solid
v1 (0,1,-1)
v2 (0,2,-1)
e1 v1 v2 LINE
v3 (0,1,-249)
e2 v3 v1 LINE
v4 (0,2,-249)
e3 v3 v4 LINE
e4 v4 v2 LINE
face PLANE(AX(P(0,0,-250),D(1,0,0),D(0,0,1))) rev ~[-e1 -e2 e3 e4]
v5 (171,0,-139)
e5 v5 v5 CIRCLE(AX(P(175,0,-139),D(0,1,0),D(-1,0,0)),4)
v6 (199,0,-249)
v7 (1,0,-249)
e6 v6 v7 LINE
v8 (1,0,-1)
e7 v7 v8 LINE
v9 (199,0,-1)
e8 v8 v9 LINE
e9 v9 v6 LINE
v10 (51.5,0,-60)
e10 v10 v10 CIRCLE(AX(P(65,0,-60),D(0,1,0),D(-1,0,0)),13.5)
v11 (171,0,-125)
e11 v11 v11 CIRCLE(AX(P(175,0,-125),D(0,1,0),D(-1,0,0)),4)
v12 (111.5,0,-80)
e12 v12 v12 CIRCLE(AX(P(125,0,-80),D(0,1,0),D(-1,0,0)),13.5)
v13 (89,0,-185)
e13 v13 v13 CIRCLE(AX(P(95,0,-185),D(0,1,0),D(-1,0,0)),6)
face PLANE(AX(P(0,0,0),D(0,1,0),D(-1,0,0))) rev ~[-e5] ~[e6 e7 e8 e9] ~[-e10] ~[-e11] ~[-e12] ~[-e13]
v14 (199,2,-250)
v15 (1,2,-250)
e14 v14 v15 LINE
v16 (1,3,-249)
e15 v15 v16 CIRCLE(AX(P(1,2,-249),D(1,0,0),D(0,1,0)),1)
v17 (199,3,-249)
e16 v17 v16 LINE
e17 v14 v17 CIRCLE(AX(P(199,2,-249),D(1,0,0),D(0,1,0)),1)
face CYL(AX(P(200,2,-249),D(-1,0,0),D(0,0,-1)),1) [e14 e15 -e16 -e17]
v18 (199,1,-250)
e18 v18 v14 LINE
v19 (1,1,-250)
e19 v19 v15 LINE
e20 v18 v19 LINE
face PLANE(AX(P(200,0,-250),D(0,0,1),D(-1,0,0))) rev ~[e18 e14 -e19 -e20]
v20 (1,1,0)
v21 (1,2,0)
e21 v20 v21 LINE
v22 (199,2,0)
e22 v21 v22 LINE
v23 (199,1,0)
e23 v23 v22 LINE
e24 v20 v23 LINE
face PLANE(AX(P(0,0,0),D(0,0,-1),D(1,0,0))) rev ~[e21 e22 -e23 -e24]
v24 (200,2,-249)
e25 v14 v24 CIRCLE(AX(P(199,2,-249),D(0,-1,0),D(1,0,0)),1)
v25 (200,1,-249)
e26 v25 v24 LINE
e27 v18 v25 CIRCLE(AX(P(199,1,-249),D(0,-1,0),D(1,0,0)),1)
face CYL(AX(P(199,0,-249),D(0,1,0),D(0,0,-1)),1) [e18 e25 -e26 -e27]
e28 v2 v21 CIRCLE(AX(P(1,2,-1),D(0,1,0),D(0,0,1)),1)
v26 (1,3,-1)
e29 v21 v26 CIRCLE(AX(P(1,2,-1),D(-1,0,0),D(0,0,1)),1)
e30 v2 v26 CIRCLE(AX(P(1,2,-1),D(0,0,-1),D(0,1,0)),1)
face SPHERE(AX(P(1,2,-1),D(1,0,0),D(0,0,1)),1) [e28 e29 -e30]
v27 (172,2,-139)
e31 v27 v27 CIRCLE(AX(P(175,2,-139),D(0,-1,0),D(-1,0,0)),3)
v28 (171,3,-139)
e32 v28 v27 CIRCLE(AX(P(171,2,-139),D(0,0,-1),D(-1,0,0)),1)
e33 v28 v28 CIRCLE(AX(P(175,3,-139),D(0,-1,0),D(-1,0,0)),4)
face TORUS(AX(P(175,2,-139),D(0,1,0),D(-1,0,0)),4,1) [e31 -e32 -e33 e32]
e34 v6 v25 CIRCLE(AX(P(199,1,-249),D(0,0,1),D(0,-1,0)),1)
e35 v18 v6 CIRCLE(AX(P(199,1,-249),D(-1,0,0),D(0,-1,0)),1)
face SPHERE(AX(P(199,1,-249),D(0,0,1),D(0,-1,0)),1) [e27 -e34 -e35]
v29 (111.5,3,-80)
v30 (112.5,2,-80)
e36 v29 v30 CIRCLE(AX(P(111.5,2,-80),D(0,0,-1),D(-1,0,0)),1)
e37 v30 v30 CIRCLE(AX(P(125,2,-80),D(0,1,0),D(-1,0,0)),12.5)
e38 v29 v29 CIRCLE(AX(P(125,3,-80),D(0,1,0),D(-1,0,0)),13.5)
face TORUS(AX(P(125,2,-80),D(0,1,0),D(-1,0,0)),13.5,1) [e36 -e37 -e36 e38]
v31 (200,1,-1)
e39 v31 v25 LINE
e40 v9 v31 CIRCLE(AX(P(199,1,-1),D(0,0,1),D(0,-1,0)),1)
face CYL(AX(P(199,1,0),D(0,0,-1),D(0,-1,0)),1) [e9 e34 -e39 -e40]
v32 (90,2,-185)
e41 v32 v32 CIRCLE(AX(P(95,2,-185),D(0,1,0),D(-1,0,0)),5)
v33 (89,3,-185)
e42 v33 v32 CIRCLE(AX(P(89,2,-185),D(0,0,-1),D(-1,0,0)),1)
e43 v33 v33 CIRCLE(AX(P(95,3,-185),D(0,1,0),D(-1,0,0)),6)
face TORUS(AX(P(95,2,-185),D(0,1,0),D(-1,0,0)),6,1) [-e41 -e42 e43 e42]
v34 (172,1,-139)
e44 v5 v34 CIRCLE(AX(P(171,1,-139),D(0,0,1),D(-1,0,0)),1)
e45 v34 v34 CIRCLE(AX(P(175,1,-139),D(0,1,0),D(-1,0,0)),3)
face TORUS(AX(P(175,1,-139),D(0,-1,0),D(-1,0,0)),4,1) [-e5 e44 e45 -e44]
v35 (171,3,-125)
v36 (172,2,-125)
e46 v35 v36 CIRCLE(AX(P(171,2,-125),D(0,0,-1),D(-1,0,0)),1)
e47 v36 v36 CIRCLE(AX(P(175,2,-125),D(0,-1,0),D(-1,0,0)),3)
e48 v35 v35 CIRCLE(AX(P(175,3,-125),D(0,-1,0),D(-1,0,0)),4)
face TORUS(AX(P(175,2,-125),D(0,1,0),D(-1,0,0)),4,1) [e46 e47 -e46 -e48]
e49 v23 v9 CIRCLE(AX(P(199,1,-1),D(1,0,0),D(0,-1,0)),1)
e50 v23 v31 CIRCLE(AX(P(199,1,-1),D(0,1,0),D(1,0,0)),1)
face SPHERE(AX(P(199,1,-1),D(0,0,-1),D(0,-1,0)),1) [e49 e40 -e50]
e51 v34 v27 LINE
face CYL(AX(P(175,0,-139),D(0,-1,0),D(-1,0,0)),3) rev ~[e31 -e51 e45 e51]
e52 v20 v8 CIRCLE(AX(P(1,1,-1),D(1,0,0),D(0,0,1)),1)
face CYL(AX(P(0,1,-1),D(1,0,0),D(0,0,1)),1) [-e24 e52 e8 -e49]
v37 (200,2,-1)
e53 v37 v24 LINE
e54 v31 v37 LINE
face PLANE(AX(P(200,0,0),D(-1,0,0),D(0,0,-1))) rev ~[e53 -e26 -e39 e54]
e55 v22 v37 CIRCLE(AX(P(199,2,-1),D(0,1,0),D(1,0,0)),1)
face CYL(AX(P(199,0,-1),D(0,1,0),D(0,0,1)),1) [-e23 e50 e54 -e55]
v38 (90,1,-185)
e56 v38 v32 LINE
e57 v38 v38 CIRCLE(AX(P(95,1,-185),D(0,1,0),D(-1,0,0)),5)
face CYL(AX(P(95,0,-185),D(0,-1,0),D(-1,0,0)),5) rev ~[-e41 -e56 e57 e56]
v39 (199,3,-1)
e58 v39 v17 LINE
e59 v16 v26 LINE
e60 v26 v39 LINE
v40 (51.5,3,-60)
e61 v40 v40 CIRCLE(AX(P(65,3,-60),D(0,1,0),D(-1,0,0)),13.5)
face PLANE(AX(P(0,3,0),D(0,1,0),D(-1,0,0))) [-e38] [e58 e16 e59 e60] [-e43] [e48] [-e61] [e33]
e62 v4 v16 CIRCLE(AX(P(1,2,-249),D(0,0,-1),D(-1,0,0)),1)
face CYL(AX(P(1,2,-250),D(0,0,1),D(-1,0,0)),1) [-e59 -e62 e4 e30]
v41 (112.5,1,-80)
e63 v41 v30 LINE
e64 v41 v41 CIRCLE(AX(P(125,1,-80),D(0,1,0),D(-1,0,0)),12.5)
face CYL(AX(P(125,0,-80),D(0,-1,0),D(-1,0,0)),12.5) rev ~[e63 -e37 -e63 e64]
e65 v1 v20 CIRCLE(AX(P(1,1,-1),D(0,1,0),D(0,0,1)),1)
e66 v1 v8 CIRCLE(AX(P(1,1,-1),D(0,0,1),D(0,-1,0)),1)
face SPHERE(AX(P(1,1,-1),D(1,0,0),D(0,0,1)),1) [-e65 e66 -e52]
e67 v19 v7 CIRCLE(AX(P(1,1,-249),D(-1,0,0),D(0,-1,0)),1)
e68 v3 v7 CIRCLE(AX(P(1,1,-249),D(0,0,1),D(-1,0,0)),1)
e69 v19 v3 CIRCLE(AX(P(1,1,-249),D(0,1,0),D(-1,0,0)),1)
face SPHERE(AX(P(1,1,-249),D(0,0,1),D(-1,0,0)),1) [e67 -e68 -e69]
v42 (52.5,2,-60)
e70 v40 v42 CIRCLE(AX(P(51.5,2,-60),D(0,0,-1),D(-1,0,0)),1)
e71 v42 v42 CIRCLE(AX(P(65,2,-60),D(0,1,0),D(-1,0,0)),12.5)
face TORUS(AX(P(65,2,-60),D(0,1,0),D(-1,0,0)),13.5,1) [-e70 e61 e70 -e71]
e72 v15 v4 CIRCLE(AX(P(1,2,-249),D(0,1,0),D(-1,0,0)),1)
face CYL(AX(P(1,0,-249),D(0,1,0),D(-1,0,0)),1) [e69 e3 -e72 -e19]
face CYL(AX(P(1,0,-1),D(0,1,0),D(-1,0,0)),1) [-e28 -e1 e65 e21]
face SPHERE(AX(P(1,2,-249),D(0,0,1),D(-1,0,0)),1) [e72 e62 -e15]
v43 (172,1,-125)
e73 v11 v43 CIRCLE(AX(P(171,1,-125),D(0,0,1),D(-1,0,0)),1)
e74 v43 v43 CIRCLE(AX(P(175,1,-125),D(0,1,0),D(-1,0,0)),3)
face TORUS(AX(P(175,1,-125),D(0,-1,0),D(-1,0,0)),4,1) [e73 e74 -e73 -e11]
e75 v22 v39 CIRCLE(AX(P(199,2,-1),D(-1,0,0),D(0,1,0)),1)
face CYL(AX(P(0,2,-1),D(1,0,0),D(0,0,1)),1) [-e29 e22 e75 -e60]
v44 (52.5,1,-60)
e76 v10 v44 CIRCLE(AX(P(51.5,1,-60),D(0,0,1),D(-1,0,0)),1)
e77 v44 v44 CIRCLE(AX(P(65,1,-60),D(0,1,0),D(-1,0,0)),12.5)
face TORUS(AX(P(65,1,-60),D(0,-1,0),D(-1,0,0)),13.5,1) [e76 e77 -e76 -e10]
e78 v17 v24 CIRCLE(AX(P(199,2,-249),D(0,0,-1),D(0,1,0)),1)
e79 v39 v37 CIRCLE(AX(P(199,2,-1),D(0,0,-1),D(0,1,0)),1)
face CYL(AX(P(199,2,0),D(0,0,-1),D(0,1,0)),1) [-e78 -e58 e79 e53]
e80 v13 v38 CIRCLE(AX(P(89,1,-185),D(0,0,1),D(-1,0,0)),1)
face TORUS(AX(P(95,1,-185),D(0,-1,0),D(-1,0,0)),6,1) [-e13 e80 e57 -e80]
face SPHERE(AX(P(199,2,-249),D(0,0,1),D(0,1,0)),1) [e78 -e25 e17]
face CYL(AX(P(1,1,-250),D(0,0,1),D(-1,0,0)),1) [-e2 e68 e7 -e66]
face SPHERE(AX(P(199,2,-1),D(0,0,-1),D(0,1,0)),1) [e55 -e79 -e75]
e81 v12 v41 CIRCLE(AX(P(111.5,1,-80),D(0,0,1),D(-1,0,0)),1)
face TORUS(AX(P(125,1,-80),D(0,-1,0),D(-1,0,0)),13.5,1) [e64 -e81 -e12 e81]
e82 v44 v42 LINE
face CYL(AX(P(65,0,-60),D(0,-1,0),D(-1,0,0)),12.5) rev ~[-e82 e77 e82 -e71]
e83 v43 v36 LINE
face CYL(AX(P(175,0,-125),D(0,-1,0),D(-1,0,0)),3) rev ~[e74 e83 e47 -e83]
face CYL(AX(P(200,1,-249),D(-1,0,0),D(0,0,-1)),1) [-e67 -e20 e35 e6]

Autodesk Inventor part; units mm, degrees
ref_plane "YZ Plane" through (0, 0, 0) normal (1, 0, 0) x (0, 1, 0)
ref_plane "XZ Plane" through (0, 0, 0) normal (0, 1, 0) x (-1, 0, 0)
ref_plane "XY Plane" through (0, 0, 0) normal (0, 0, 1) x (1, 0, 0)
sketch "page_lines" plane through (0, 0, 0) normal (0, 1, 0) x (-1, 0, 0)
  line L0 (0, 0) -> (-200, 0)
  line L1 (-200, 0) -> (-200, -250)
  line L2 (-200, -250) -> (0, -250)
  line L3 (0, -250) -> (0, 0)
  circle A0 centre (-65, -60) radius 6
  circle A1 centre (-125, -80) radius 6
  circle A2 centre (-65, -60) radius 12.5
  circle A3 centre (-65, -60) radius 8.5
  circle A4 centre (-125, -80) radius 8.5
  circle A5 centre (-125, -80) radius 12.5
  circle A6 centre (-175, -125) radius 3
  line L4 (-175, -125) -> (-175, -209)
  line L5 (-175, -125) -> (-91, -125) construction
  circle A7 centre (-175, -139) radius 3
  circle A8 centre (-175, -153) radius 3
  circle A9 centre (-175, -167) radius 3
  circle A10 centre (-175, -181) radius 3
  circle A11 centre (-175, -195) radius 3
  circle A12 centre (-175, -209) radius 3
  circle A13 centre (-95, -185) radius 2.5
  circle A14 centre (-95, -185) radius 5
  point P0 (-200, -125)
  dimension "d0" = 200
  dimension "d1" = 250
  dimension "d2" = 12
  dimension "d3" = 12
  dimension "d4" = 25
  dimension "d5" = 17
  dimension "d6" = 17
  dimension "d7" = 25
  dimension "d8" = 75
  dimension "d9" = 80
  dimension "d10" = 65
  dimension "d11" = 60
  dimension "d12" = 6
  dimension "d13" = 84
  dimension "d14" = 90
  dimension "d15" = 25
  dimension "d16" = 125
  dimension "d19" = 14
  dimension "d24" = 5
  dimension "d25" = 10
  dimension "d26" = 65
  dimension "d27" = 95
extrude "and" add sketch "page_lines" along normal blind 3 contours L3 L2 L1 L0 | A8 L4 | L4 A8 | A9 L4 | L4 A9 | A10 L4 | L4 A10 | A11 L4 | L4 A11 | A12
fillet "Fillet1" radius 1 22 edges at (77.5, 3, -60) (77.5, 0, -60) (100, 3, -185) (100, 0, -185) (178, 3, -125) (178, 0, -125) (200, 3, -125) (200, 0, -125) (100, 0, 0) (100, 3, 0) (200, 1.5, 0) (0, 1.5, 0) (0, 3, -125) (0, 0, -125) (0, 1.5, -250) (100, 3, -250) (100, 0, -250) (200, 1.5, -250) (178, 3, -139) (178, 0, -139) (137.5, 3, -80) (137.5, 0, -80)
properties part number "pages_and"
